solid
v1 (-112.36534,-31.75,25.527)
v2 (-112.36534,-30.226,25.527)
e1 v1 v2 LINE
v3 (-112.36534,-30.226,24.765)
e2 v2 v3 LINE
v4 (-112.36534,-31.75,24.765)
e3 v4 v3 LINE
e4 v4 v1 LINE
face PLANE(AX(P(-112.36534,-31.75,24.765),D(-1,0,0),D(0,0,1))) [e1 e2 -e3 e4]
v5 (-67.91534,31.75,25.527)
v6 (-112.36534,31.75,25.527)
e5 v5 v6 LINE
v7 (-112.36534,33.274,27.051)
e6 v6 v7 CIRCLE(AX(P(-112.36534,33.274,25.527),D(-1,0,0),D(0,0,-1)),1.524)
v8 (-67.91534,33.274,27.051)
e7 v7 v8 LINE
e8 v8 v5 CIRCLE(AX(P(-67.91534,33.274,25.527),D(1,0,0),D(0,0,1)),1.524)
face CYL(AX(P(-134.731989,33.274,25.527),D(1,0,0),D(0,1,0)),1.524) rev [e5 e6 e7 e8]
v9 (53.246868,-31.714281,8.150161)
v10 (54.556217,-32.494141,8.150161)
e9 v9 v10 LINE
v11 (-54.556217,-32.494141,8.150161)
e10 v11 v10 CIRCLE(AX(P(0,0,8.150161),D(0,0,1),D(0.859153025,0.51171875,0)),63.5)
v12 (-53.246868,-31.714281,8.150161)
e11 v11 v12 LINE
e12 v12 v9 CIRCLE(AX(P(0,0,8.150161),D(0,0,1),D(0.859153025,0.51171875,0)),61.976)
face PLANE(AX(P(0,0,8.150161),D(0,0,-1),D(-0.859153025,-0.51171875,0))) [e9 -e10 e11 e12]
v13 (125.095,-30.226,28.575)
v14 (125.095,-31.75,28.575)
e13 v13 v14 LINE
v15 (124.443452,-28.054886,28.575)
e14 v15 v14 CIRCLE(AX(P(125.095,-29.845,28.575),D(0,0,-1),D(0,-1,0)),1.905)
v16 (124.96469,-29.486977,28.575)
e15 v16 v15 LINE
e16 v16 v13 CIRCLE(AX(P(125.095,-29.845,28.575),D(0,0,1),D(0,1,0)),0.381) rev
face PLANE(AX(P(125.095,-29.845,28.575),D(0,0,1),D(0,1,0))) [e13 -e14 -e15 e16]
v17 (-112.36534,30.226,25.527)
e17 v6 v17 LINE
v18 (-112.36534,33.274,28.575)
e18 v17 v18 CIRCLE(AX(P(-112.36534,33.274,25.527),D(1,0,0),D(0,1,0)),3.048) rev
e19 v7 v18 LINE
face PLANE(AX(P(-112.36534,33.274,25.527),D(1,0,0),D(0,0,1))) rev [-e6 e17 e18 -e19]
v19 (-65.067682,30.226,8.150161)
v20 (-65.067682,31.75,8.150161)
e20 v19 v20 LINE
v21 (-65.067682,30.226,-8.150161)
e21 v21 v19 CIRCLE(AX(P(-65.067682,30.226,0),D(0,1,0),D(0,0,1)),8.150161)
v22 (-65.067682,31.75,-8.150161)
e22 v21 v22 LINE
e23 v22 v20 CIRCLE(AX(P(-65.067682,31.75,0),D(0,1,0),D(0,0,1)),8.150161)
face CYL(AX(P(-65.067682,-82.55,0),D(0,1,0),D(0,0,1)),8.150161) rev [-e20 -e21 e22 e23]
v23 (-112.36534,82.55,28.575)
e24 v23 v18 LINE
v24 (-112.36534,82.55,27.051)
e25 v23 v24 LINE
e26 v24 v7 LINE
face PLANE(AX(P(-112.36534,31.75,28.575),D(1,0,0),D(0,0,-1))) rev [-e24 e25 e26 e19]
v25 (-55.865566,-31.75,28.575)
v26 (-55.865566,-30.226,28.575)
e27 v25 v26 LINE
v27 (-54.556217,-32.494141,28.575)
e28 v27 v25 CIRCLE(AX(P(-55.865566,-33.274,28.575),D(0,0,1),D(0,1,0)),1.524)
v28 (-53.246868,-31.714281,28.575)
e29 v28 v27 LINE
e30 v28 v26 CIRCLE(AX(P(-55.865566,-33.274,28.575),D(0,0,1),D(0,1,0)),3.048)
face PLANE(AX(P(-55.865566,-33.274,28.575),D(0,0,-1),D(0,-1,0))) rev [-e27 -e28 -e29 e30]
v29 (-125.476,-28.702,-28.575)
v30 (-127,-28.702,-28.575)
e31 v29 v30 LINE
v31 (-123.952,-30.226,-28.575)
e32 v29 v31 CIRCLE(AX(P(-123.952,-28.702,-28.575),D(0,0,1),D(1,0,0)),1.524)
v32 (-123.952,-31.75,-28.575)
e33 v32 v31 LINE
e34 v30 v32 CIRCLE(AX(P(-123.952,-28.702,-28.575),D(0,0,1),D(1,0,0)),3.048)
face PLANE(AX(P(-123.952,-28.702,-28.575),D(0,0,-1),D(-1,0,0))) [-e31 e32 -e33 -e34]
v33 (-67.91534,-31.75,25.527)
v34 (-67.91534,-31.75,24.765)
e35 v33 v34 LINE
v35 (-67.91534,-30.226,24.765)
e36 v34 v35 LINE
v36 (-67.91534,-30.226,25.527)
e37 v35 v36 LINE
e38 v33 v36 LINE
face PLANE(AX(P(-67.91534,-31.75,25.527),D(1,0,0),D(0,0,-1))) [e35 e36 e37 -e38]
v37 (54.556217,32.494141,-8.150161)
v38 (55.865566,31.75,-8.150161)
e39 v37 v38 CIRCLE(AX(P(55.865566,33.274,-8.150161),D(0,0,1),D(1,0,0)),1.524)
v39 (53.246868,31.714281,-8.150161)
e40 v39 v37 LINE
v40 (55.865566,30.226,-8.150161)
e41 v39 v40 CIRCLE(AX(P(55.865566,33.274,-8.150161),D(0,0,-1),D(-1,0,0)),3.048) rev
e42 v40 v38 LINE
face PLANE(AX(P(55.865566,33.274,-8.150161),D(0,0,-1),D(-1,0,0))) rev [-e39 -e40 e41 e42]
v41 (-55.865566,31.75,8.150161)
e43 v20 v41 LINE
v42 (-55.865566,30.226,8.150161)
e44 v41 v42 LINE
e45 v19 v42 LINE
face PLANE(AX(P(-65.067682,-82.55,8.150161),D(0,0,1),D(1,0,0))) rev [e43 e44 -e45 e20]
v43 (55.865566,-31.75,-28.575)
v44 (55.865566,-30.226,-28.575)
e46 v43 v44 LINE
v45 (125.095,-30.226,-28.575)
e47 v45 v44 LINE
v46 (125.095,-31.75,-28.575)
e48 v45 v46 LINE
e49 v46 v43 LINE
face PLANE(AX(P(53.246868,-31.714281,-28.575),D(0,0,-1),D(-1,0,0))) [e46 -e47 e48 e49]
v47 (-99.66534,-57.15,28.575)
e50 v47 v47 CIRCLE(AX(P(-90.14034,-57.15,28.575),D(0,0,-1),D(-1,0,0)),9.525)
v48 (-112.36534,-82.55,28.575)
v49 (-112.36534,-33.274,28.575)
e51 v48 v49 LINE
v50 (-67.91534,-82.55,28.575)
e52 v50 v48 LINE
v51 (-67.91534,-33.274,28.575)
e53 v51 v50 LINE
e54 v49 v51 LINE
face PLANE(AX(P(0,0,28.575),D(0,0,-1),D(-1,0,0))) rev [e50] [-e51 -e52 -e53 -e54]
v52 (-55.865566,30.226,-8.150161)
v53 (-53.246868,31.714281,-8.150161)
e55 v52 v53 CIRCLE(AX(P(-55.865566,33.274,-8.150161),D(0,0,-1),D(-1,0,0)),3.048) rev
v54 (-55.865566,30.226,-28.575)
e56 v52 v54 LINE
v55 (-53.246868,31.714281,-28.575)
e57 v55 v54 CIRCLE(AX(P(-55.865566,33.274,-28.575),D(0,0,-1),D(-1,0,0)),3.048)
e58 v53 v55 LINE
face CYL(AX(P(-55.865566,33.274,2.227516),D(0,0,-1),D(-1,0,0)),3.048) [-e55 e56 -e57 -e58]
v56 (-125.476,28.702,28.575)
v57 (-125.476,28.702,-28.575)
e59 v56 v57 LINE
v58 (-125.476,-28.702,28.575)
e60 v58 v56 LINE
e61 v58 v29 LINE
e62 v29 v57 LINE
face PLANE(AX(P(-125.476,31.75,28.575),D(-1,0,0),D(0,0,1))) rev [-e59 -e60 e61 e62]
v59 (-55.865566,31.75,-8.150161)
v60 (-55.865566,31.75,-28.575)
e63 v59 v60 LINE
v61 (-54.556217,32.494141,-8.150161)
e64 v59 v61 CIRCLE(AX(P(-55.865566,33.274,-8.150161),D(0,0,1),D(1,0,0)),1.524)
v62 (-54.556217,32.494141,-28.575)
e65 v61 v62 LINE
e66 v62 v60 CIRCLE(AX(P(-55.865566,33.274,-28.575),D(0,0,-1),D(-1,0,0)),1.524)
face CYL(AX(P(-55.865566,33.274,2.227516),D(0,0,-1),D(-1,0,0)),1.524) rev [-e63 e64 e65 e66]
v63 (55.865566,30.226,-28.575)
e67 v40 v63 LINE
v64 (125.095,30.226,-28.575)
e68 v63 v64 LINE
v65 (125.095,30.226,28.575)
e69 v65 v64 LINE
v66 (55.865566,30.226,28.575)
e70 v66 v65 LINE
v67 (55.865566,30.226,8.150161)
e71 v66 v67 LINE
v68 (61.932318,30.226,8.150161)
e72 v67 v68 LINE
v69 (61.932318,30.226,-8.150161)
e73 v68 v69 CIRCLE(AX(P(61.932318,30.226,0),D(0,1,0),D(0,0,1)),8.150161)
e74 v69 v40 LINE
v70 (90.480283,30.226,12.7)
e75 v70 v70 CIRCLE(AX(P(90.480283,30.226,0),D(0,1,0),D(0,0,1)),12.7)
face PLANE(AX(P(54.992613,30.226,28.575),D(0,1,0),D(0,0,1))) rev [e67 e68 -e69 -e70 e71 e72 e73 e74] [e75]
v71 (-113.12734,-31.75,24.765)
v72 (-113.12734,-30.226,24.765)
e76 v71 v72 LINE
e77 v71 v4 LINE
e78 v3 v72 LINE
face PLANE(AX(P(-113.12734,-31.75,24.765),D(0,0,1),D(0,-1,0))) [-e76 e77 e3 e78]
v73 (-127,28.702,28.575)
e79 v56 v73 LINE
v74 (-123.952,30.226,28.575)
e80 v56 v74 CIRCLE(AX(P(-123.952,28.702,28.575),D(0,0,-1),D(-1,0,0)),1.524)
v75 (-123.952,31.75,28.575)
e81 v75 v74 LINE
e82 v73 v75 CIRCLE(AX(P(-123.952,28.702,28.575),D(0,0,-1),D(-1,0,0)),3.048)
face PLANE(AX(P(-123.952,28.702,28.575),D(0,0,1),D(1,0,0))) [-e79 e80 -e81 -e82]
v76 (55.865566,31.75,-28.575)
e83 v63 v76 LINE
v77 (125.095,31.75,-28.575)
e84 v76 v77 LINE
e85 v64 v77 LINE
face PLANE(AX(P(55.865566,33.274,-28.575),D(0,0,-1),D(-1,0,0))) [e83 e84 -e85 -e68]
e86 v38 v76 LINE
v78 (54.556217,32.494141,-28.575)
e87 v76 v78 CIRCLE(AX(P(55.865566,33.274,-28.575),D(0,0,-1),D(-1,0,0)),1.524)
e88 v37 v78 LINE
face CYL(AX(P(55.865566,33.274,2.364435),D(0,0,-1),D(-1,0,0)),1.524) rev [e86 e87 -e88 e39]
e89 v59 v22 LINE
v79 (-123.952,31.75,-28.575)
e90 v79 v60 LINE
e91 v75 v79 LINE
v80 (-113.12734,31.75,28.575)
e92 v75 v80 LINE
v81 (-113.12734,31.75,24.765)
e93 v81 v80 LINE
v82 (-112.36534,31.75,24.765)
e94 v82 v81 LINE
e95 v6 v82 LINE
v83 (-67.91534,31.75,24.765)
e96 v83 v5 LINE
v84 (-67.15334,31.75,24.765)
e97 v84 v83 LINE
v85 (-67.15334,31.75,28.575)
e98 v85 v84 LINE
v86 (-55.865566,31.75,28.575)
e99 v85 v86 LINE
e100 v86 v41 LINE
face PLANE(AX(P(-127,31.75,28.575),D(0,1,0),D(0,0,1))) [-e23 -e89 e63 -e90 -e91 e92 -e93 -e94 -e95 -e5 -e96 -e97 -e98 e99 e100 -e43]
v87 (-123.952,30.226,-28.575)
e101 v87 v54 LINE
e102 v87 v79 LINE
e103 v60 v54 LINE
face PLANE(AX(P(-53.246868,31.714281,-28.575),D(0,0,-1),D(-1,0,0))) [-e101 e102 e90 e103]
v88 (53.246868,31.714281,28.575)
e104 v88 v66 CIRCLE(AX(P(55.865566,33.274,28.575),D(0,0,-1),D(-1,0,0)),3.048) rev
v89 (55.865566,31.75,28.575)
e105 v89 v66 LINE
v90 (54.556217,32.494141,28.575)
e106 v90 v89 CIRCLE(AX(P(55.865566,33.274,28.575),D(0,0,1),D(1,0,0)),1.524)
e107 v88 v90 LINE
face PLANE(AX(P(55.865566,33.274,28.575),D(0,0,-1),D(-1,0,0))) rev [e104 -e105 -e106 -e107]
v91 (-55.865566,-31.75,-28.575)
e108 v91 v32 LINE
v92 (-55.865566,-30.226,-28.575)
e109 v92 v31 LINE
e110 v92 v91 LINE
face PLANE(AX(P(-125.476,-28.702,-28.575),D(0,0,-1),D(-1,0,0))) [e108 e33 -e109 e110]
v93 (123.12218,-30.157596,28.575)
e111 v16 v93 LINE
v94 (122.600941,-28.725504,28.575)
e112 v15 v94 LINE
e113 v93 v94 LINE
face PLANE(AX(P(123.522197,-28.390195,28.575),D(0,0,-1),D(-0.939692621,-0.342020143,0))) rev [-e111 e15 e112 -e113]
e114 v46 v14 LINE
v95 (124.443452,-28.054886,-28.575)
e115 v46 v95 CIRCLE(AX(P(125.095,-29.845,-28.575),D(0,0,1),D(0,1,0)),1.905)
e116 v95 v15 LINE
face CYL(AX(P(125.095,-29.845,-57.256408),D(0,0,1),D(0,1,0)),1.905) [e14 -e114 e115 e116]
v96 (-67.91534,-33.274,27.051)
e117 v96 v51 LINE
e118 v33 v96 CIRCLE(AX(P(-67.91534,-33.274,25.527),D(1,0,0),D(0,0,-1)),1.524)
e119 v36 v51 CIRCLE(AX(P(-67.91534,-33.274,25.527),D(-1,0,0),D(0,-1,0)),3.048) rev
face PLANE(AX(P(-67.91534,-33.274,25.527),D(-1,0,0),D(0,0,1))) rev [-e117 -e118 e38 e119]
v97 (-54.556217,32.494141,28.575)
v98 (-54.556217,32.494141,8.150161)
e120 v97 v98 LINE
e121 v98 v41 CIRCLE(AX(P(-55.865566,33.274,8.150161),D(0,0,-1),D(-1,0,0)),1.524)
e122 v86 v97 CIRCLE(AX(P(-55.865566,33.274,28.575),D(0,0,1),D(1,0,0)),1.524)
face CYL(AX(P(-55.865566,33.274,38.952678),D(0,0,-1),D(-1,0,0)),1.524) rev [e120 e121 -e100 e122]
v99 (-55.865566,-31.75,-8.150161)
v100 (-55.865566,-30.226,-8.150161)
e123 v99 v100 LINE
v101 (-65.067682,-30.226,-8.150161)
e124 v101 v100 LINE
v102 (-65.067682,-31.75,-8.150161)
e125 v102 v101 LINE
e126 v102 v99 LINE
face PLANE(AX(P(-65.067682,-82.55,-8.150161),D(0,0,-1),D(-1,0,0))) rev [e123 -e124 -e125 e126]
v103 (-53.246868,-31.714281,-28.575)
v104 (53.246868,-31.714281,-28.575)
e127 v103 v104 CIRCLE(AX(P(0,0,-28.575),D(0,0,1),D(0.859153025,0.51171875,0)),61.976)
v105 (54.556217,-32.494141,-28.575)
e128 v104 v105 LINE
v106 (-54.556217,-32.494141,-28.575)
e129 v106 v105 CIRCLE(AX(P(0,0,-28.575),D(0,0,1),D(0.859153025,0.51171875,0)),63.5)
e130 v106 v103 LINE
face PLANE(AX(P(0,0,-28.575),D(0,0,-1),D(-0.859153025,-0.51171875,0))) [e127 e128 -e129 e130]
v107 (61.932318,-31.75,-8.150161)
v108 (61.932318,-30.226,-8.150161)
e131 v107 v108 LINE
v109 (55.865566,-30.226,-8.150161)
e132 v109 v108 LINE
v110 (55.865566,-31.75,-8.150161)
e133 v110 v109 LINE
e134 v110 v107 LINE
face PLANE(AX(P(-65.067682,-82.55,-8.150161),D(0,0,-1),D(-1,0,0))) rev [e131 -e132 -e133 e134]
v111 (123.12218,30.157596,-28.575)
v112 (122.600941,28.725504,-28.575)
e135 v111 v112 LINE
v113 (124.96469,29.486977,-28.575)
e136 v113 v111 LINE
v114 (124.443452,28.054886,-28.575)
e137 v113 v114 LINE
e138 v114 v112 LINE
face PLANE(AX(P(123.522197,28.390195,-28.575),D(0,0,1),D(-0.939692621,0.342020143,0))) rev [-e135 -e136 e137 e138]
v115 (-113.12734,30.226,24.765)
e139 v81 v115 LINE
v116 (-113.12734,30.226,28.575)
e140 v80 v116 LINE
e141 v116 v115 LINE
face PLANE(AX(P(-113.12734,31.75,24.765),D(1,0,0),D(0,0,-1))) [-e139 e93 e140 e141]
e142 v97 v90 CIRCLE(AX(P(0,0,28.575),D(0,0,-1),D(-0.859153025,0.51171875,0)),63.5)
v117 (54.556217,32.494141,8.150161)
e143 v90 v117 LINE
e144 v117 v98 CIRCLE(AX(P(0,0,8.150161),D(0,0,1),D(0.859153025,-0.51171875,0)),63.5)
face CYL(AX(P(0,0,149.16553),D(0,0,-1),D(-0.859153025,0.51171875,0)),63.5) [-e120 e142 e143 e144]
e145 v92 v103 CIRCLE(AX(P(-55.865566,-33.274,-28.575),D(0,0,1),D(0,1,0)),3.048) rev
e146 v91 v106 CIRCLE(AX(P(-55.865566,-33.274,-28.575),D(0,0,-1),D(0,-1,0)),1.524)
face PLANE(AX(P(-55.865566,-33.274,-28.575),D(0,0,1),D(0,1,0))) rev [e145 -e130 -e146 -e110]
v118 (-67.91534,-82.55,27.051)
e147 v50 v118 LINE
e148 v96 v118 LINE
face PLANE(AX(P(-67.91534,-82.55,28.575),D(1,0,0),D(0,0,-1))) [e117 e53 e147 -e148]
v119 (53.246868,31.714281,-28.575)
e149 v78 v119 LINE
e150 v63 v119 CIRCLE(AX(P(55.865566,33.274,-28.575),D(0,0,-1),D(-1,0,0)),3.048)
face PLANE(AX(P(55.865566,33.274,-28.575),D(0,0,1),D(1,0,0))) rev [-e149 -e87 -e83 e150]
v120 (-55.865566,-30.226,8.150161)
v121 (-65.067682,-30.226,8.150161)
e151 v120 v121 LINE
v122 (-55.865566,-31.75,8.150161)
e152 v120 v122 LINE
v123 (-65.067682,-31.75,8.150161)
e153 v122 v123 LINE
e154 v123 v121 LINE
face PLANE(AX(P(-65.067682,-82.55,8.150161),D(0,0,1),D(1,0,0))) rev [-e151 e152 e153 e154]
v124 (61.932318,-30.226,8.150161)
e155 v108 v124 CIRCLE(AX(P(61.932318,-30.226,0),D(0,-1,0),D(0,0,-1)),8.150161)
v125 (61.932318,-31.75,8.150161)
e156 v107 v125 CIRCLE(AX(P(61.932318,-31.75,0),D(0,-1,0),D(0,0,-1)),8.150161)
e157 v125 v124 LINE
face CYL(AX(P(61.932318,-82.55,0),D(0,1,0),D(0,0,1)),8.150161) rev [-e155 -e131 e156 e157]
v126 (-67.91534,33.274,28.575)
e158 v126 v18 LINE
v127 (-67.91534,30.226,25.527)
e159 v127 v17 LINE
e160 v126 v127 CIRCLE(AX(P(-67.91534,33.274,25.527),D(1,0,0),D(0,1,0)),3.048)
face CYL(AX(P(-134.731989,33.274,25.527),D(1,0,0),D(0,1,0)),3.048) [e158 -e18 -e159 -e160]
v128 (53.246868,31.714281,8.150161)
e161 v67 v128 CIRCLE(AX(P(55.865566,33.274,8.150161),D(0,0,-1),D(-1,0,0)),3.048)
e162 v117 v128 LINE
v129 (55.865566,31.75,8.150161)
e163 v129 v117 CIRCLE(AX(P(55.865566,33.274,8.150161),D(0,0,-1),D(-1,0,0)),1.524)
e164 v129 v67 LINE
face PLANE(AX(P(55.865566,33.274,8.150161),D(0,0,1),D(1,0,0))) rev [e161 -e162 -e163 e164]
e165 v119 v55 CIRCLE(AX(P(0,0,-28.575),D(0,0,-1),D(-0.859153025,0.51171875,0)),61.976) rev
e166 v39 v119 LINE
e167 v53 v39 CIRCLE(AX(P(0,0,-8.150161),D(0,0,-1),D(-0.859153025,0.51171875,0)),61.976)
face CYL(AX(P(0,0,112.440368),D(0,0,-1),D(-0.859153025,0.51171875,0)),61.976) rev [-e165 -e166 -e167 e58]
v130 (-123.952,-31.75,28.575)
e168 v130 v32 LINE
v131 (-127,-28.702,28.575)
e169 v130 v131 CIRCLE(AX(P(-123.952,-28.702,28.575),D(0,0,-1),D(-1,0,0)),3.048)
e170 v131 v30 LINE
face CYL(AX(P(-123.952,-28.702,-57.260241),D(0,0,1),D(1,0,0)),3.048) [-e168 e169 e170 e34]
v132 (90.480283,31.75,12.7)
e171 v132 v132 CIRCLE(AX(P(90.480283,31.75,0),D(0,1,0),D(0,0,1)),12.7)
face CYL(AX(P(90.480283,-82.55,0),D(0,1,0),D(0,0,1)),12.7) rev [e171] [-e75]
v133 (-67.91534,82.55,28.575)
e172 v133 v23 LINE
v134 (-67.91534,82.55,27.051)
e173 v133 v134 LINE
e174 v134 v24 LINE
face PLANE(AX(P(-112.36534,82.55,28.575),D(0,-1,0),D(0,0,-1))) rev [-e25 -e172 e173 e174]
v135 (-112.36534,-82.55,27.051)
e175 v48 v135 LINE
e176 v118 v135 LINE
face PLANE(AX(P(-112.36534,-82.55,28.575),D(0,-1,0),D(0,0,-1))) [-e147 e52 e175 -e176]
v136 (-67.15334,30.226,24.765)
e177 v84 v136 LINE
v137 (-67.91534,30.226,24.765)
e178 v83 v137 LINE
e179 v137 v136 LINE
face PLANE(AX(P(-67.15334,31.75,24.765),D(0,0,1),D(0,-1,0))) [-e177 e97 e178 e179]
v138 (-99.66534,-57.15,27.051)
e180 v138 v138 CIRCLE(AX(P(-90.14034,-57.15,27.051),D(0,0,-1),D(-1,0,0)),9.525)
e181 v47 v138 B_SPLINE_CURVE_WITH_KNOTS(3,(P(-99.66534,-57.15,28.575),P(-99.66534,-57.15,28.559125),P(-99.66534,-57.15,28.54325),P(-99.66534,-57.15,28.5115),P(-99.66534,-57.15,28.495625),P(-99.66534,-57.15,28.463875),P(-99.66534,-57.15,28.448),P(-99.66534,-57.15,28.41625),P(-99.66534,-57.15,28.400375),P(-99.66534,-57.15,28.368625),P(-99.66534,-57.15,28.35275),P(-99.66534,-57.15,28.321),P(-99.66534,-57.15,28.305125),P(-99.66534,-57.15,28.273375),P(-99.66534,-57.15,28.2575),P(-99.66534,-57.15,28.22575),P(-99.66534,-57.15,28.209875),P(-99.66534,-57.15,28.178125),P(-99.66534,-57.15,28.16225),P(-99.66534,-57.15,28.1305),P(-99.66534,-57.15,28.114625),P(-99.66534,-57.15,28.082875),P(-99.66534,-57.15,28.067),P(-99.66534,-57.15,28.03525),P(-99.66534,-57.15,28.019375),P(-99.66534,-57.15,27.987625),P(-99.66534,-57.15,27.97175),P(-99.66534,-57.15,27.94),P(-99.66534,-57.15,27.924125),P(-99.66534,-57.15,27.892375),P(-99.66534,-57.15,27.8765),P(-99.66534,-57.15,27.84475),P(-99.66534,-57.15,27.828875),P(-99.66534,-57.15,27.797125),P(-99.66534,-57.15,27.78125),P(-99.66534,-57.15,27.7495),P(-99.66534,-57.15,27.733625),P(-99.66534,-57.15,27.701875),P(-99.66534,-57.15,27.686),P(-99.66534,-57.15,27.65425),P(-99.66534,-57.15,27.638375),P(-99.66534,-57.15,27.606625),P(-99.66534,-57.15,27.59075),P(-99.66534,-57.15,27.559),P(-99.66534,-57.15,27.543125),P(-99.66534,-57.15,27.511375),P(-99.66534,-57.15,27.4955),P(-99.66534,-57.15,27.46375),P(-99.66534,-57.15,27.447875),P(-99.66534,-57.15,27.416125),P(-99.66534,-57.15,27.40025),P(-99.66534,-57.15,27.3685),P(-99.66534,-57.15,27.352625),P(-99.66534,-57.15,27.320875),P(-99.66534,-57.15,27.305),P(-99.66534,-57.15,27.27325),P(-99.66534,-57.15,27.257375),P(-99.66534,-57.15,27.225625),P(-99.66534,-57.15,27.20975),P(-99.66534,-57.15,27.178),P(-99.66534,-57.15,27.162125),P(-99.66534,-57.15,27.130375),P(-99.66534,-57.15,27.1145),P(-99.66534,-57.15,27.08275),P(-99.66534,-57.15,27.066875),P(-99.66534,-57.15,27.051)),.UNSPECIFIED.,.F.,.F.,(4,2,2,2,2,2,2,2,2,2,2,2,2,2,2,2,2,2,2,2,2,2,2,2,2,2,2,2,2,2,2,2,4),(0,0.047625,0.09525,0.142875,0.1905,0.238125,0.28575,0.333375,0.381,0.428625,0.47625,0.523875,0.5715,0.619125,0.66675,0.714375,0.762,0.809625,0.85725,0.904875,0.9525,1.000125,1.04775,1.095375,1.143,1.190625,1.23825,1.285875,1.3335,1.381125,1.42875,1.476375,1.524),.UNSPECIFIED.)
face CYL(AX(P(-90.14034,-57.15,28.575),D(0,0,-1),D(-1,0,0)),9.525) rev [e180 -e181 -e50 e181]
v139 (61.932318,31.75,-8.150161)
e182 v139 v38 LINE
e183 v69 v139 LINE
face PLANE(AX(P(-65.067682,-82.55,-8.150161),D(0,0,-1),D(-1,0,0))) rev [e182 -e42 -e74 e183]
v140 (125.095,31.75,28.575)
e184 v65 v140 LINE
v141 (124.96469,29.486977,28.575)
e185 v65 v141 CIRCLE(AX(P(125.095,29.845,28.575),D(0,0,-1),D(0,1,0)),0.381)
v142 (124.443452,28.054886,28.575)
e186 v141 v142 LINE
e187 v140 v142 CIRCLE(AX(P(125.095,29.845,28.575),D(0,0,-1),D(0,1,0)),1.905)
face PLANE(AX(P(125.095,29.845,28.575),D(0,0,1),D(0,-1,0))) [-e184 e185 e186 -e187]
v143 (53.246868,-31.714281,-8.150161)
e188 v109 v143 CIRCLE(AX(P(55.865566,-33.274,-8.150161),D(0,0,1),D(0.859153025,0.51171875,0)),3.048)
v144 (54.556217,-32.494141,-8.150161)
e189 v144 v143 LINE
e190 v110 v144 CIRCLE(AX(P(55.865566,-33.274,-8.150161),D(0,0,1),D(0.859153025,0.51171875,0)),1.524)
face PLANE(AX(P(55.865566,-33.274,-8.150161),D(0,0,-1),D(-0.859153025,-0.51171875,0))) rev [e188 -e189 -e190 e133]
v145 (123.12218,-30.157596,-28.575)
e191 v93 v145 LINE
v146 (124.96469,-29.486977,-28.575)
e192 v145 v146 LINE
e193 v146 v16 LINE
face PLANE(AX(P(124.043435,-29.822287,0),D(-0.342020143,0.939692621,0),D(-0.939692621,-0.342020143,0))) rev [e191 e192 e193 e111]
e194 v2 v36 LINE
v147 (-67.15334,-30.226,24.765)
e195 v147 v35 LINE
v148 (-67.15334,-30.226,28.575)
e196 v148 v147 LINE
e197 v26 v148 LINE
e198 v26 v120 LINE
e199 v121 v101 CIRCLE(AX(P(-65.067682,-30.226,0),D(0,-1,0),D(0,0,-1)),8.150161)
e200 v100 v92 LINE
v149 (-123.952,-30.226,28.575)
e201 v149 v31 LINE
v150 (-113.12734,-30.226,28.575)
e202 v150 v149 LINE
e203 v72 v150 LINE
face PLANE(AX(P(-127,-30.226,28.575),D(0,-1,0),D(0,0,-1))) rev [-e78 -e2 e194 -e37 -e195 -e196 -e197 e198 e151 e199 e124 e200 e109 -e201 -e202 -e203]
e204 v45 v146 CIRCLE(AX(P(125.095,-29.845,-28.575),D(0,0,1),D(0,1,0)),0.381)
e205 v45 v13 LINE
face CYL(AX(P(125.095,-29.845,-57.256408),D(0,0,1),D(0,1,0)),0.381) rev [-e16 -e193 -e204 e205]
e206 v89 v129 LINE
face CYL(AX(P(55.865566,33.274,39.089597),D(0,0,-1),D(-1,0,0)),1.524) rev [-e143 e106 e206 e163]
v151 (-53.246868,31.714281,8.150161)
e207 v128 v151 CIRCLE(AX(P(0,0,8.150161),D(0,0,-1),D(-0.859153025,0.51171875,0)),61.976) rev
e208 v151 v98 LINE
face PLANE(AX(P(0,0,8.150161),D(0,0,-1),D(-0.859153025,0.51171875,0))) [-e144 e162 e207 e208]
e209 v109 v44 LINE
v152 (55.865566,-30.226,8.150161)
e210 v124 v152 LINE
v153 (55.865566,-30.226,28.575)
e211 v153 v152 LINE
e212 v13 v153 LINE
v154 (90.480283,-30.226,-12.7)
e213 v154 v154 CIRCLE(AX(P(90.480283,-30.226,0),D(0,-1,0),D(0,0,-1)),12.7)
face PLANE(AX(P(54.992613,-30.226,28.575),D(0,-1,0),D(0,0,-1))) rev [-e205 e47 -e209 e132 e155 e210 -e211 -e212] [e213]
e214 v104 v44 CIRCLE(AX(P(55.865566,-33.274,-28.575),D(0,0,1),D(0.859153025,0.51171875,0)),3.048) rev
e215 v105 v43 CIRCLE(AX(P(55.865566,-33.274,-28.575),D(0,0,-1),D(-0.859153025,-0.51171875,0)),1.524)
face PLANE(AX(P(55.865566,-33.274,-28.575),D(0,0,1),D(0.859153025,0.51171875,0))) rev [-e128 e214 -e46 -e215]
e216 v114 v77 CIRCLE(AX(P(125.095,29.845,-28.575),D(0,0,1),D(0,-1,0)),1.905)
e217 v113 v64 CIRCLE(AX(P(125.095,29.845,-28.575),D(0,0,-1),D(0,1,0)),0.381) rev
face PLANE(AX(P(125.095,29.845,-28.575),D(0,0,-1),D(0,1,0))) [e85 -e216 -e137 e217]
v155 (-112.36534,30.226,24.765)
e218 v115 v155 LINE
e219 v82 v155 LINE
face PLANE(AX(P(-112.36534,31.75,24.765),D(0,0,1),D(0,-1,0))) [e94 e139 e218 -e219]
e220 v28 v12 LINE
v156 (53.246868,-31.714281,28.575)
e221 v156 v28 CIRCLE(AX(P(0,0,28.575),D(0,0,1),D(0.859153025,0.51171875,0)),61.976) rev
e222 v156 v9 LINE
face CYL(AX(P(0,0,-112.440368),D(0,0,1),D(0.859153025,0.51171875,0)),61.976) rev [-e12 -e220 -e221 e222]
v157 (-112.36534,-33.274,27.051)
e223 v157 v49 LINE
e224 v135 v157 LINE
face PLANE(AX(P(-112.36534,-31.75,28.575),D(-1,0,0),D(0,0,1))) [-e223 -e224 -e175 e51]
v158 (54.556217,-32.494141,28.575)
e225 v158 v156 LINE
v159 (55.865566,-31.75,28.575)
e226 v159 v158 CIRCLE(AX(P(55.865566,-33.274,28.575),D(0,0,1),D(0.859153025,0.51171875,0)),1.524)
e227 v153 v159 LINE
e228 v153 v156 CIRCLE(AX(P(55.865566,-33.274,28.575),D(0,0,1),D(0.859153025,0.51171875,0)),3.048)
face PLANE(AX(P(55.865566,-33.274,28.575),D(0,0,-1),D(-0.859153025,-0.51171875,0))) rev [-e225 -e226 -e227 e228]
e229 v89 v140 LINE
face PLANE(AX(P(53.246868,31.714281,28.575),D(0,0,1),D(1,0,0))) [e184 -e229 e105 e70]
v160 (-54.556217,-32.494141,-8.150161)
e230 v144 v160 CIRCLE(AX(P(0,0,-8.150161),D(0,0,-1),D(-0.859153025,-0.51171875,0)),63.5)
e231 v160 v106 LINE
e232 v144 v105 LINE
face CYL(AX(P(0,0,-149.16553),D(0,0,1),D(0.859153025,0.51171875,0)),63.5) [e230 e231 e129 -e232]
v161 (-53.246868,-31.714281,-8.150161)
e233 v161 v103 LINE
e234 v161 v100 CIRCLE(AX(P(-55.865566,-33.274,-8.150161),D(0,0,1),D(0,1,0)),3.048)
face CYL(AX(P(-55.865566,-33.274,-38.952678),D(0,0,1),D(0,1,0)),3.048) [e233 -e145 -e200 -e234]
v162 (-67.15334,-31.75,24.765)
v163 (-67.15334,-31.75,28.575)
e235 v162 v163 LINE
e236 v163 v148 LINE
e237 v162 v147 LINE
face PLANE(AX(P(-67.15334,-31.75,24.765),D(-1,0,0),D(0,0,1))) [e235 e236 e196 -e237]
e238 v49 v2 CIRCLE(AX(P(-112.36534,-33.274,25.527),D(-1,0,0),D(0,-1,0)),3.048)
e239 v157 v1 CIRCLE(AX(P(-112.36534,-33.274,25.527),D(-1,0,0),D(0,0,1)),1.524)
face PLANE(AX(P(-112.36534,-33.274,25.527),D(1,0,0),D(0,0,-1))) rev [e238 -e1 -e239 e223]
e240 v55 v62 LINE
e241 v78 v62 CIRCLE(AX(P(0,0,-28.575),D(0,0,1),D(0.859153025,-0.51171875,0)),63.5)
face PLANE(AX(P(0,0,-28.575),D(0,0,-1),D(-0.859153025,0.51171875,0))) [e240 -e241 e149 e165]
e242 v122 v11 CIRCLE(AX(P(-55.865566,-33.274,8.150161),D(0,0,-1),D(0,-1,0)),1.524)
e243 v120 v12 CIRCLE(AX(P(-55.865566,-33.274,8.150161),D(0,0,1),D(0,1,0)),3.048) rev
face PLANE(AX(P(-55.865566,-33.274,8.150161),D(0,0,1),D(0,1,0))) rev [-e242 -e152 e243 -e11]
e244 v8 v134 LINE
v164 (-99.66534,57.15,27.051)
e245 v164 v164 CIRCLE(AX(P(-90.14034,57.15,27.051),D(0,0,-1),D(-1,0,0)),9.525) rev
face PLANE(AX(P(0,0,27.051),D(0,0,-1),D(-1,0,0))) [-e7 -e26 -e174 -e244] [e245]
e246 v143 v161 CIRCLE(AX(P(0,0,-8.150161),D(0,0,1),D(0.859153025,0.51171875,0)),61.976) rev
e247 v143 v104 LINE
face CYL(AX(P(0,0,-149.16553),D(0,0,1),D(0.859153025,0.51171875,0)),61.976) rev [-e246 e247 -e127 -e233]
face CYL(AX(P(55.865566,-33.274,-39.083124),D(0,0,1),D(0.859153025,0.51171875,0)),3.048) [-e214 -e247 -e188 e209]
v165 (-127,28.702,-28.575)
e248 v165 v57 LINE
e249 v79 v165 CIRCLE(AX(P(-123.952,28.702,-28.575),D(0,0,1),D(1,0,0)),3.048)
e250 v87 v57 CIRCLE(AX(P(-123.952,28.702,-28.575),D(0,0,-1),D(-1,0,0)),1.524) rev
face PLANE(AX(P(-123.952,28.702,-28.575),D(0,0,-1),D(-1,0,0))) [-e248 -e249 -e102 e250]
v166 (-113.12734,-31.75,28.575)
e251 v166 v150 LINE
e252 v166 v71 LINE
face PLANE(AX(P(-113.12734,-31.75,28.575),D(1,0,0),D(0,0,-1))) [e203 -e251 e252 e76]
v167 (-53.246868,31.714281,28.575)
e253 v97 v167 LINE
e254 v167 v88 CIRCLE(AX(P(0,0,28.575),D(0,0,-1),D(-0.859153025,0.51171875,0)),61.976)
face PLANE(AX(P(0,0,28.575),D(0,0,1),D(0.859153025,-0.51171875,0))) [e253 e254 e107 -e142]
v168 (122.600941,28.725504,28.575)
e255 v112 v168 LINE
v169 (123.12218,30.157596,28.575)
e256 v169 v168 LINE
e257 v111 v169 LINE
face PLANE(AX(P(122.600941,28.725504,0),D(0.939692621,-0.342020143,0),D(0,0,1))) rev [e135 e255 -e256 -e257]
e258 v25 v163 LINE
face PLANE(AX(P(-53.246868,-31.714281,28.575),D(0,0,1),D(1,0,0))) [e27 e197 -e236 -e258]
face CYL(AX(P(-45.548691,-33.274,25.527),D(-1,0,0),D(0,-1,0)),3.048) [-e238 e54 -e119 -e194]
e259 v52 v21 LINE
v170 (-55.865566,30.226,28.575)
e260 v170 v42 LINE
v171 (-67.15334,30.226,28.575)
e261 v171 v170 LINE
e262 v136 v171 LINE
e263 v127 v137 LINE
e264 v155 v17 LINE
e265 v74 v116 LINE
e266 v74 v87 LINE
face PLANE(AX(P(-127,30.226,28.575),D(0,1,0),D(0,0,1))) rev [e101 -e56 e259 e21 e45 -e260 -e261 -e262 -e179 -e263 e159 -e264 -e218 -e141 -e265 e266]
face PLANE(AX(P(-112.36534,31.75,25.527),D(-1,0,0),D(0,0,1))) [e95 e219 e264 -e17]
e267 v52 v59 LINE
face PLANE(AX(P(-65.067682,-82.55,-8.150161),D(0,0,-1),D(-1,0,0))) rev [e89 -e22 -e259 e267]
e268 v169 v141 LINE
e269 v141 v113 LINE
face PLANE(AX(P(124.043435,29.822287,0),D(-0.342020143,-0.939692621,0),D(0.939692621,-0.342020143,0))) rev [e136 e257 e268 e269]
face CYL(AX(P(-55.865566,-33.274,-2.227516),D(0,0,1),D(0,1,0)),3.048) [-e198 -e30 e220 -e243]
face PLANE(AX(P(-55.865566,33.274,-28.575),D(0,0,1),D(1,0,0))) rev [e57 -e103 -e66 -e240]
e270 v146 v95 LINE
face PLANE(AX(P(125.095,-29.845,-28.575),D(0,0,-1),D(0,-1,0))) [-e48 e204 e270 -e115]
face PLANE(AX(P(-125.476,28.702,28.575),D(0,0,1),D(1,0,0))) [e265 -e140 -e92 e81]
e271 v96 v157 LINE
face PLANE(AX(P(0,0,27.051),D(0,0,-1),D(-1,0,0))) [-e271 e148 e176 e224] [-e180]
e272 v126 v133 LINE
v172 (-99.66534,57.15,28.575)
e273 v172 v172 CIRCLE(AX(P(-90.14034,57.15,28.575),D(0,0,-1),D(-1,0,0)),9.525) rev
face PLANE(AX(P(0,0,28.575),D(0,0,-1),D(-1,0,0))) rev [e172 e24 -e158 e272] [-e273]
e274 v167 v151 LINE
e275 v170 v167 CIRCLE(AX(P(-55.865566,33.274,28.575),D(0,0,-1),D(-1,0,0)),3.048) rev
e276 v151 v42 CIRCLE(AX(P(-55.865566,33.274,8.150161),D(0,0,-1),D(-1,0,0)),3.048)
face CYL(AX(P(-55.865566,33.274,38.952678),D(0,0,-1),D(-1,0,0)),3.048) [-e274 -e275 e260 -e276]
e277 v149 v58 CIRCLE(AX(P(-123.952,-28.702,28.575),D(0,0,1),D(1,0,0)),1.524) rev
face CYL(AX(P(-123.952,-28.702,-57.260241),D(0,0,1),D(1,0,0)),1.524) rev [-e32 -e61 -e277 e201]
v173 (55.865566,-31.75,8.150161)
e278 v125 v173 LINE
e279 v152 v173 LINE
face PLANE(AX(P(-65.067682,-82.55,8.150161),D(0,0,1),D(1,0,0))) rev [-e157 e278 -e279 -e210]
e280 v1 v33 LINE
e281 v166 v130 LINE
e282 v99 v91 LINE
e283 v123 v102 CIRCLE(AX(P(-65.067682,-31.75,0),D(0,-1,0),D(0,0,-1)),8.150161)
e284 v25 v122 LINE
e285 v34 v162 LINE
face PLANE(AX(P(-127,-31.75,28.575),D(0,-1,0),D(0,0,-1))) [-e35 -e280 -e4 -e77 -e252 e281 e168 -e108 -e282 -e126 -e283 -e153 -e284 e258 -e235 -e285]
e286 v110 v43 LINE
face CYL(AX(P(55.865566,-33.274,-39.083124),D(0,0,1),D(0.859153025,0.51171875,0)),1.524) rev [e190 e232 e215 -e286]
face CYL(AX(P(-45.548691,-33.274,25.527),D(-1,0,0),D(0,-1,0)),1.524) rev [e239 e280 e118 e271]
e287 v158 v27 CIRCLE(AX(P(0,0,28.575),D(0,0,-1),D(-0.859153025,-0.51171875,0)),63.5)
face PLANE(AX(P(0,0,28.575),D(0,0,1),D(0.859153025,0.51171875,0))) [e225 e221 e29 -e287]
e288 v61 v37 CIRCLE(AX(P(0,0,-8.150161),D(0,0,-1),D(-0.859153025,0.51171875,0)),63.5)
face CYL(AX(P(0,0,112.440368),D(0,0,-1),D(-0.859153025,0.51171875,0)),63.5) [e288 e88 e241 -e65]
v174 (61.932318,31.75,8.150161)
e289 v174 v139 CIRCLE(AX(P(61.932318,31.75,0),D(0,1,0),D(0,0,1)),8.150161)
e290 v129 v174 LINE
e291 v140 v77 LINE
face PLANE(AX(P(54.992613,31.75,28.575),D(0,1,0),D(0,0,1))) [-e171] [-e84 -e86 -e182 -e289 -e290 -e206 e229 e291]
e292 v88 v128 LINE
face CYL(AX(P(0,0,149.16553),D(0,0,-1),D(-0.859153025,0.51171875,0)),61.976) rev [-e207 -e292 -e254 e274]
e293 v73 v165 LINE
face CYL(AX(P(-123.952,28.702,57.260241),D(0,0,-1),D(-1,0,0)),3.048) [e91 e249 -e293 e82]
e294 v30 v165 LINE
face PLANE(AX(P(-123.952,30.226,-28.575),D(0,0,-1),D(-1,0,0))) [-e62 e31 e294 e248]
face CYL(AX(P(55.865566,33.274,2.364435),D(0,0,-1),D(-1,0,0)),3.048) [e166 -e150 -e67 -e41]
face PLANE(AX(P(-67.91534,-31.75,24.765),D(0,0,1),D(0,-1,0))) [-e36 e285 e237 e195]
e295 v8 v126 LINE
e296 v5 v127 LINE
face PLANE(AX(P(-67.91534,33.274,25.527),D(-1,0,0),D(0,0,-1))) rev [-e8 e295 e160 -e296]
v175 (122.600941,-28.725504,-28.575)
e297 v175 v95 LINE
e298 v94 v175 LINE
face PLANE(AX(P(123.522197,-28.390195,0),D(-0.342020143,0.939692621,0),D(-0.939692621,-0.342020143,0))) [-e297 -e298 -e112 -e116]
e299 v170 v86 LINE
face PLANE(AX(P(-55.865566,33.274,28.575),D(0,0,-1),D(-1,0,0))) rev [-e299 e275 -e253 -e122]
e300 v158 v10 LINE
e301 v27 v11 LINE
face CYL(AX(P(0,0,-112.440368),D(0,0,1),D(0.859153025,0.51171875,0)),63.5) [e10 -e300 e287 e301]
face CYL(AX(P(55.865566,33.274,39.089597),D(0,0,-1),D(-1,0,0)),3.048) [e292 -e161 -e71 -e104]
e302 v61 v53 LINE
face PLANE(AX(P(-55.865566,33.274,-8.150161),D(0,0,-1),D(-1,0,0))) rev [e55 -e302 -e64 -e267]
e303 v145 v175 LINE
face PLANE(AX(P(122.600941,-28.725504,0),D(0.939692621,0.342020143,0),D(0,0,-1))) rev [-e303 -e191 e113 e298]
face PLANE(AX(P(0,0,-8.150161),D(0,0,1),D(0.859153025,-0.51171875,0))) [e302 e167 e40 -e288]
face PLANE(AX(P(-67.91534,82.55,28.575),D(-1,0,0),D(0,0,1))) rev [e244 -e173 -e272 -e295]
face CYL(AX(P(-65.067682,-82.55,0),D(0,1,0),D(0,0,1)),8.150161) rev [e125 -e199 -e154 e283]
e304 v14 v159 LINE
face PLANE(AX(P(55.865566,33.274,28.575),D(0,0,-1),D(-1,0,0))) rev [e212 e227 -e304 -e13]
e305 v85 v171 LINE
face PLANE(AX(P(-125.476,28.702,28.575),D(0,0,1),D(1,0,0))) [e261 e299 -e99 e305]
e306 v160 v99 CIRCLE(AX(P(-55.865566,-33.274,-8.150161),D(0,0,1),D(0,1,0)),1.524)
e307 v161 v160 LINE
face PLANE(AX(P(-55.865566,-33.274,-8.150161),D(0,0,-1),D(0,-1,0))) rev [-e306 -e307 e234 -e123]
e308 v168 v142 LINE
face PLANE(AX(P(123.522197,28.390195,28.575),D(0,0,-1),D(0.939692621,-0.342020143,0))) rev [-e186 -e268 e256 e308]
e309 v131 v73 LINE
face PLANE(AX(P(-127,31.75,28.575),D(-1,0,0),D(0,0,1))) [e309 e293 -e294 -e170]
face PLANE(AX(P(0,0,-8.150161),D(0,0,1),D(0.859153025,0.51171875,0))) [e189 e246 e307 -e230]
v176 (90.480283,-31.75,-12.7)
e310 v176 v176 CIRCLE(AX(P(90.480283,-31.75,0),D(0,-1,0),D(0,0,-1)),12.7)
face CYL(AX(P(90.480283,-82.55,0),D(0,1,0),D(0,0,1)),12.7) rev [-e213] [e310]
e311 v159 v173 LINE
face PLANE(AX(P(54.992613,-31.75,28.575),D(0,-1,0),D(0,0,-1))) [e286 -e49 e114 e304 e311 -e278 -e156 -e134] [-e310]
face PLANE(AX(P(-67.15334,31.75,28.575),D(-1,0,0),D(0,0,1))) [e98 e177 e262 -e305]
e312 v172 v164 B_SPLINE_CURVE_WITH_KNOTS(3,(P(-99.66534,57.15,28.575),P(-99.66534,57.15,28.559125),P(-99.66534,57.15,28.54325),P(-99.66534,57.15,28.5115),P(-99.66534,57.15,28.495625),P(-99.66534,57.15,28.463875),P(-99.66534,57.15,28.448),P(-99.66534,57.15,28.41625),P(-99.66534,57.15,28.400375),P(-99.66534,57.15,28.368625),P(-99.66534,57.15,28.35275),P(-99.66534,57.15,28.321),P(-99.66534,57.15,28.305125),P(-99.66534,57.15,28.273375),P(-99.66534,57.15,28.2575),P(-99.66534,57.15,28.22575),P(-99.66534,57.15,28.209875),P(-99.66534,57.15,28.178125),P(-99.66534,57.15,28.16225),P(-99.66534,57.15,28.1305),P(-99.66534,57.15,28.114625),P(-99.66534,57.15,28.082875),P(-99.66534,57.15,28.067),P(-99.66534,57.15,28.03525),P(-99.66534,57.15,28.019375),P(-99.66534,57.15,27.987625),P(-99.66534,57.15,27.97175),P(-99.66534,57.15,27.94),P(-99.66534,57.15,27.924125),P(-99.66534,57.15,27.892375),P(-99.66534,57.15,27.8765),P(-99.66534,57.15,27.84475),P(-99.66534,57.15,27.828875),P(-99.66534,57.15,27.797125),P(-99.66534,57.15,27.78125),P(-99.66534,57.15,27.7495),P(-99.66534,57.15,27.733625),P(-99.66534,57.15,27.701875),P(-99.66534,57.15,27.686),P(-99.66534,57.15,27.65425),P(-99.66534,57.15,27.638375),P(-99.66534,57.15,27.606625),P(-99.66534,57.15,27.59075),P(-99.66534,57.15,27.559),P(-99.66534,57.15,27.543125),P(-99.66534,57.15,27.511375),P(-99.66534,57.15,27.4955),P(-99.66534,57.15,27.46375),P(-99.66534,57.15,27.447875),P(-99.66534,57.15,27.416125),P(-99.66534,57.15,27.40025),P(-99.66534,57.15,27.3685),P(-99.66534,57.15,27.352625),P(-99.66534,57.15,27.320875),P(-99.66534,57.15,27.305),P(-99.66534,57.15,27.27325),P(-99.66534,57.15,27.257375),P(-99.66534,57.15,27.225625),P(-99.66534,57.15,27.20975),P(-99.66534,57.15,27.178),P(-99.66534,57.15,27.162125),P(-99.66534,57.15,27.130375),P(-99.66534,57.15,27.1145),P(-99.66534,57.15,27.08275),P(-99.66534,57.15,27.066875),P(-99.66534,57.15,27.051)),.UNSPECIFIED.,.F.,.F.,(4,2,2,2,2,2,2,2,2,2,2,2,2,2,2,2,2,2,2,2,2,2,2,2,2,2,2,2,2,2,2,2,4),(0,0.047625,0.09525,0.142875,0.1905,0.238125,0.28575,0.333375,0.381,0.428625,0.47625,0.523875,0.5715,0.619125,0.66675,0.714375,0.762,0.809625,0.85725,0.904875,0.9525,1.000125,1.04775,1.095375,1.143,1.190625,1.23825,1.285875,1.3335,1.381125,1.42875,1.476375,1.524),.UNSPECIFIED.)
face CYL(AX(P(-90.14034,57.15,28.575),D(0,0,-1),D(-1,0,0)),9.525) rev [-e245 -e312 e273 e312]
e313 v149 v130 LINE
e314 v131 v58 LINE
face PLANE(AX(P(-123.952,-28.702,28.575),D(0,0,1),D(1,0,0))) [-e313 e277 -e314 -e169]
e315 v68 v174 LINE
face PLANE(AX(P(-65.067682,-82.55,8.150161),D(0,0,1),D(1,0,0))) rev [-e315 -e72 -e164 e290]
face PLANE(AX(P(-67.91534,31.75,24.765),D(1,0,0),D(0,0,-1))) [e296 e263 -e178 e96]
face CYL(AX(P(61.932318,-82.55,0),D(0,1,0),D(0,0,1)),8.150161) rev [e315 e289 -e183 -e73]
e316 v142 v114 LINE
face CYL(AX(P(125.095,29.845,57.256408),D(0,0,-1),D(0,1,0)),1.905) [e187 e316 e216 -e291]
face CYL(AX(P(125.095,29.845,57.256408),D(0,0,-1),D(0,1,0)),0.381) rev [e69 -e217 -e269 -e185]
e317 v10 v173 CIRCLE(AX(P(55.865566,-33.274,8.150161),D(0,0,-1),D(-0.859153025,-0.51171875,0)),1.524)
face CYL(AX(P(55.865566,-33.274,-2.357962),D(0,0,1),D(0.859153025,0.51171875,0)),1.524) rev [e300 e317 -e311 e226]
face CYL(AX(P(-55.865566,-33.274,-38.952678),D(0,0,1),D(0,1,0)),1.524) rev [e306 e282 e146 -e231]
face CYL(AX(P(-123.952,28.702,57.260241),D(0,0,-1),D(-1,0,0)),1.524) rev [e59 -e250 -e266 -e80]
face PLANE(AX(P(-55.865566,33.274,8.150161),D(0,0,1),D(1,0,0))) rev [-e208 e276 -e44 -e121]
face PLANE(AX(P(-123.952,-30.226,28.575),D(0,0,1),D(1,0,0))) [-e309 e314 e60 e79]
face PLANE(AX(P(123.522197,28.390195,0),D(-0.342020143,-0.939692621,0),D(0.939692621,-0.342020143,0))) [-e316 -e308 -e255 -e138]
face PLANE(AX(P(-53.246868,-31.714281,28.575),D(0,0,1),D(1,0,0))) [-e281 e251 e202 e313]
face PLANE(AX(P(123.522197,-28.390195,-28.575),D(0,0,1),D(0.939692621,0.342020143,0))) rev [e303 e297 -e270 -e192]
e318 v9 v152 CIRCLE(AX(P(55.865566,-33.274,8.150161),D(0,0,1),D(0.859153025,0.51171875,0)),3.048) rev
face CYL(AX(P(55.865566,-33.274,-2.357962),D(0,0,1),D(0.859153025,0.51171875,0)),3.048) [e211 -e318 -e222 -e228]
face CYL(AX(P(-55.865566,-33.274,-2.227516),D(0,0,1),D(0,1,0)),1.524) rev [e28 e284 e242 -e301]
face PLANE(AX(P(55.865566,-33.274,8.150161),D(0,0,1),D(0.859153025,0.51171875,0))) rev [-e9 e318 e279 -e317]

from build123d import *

# Parameters (mm, degrees)
BASE_FLANGE1_START            = -28.575
BASE_FLANGE1_DEPTH            = 57.15
EDGE_FLANGE2_STRIP_W          = 9.144
EDGE_FLANGE2_STRIP_H          = 1.524
EDGE_FLANGE2_STRIP_CUT_DEPTH  = 44.45
EDGE_FLANGE2_RELIEF_W         = 9.906
EDGE_FLANGE2_RELIEF_H         = 0.762
EDGE_FLANGE2_RELIEF_CUT_DEPTH = 1.524
EDGE_FLANGE2_DEPTH            = 44.45
EDGE_FLANGE2_PROFILE_W        = 44.45
EDGE_FLANGE2_PROFILE_H        = 49.276
EDGE_FLANGE2_PROFILE_R        = 9.525
EDGE_FLANGE2_FLAT_DEPTH       = 1.524
HEM1_START                    = -28.575
HEM1_DEPTH                    = 57.15
HEM1_2_DEPTH                  = 57.15
SKETCH22_R                    = 12.7
CUT_EXTRUDE1_DEPTH            = 174.234005394
CUT_EXTRUDE2_DEPTH            = 174.234005394
CUT_EXTRUDE2_DEPTH_BACK       = 174.234005394


with BuildPart() as part:
    # Base-Flange1: read off the stored shape, not the designer's step
    # Base-Flange1 outline → Base-Flange1 (new body)
    with BuildSketch(Plane.XY.offset(BASE_FLANGE1_START)):
        with BuildLine():
            Line((55.865566318, 30.226), (127, 30.226))
            Line((127, 30.226), (127, 31.75))
            Line((127, 31.75), (55.865566318, 31.75))
            ThreePointArc((55.865566318, 31.75), (55.11254895, 31.949031757), (54.556217107, 32.494140625))
            ThreePointArc((54.556217107, 32.494140625), (0, 63.5), (-54.556217107, 32.494140625))
            ThreePointArc((-54.556217107, 32.494140625), (-55.11254895, 31.949031757), (-55.865566318, 31.75))
            Line((-55.865566318, 31.75), (-123.952, 31.75))
            ThreePointArc((-123.952, 31.75), (-126.107261469, 30.857261469), (-127, 28.702))
            Line((-127, 28.702), (-127, -28.702))
            ThreePointArc((-127, -28.702), (-126.107261469, -30.857261469), (-123.952, -31.75))
            Line((-123.952, -31.75), (-55.865566318, -31.75))
            ThreePointArc((-55.865566318, -31.75), (-55.11254895, -31.949031757), (-54.556217107, -32.494140625))
            ThreePointArc((-54.556217107, -32.494140625), (0, -63.5), (54.556217107, -32.494140625))
            ThreePointArc((54.556217107, -32.494140625), (55.11254895, -31.949031757), (55.865566318, -31.75))
            Line((55.865566318, -31.75), (127, -31.75))
            Line((127, -31.75), (127, -30.226))
            Line((127, -30.226), (55.865566318, -30.226))
            ThreePointArc((55.865566318, -30.226), (54.359531582, -30.624063515), (53.246867897, -31.71428125))
            ThreePointArc((53.246867897, -31.71428125), (0, -61.976), (-53.246867897, -31.71428125))
            ThreePointArc((-53.246867897, -31.71428125), (-54.359531582, -30.624063515), (-55.865566318, -30.226))
            Line((-55.865566318, -30.226), (-123.952, -30.226))
            ThreePointArc((-123.952, -30.226), (-125.029630735, -29.779630735), (-125.476, -28.702))
            Line((-125.476, -28.702), (-125.476, 28.702))
            ThreePointArc((-125.476, 28.702), (-125.029630735, 29.779630735), (-123.952, 30.226))
            Line((-123.952, 30.226), (-55.865566318, 30.226))
            ThreePointArc((-55.865566318, 30.226), (-54.359531582, 30.624063515), (-53.246867897, 31.71428125))
            ThreePointArc((-53.246867897, 31.71428125), (0, 61.976), (53.246867897, 31.71428125))
            ThreePointArc((53.246867897, 31.71428125), (54.359531582, 30.624063515), (55.865566318, 30.226))
        make_face()
    extrude(amount=BASE_FLANGE1_DEPTH)

    # Edge-Flange2: sheet metal written as solids
    # Edge-Flange2 strip (on a plane across the edge) → Edge-Flange2 strip cut (cut)
    with BuildSketch(Plane(origin=(-112.365340231, 31.75, 28.575), x_dir=(0, 0, -1), z_dir=(1, 0, 0))):
        with Locations((-1.524, -0.762)):
            Rectangle(EDGE_FLANGE2_STRIP_W, EDGE_FLANGE2_STRIP_H)
    edge_flange2_strip_cut = extrude(amount=EDGE_FLANGE2_STRIP_CUT_DEPTH, mode=Mode.SUBTRACT)

    # Edge-Flange2 relief (on the sheet) → Edge-Flange2 relief cut (cut)
    with BuildSketch(Plane(origin=(-112.365340231, 31.75, 25.527), x_dir=(0, 0, -1), z_dir=(0, 1, 0))):
        with Locations((-4.191, 0.381)):
            Rectangle(EDGE_FLANGE2_RELIEF_W, EDGE_FLANGE2_RELIEF_H)
        with Locations((-4.191, -44.831)):
            Rectangle(EDGE_FLANGE2_RELIEF_W, EDGE_FLANGE2_RELIEF_H)
    edge_flange2_relief_cut = extrude(amount=-EDGE_FLANGE2_RELIEF_CUT_DEPTH, mode=Mode.SUBTRACT)

    # Edge-Flange2 bend section (on a plane across the edge) → Edge-Flange2 (add)
    with BuildSketch(Plane(origin=(-112.365340231, 31.75, 28.575), x_dir=(0, 0, -1), z_dir=(1, 0, 0))):
        with BuildLine():
            Line((0, 1.524), (1.524, 1.524))
            ThreePointArc((1.524, 1.524), (1.970369265, 0.446369265), (3.048, 0))
            Line((3.048, 0), (3.048, -1.524))
            ThreePointArc((3.048, -1.524), (0.892738531, -0.631261469), (0, 1.524))
        make_face()
    edge_flange2 = extrude(amount=EDGE_FLANGE2_DEPTH)

    # Edge-Flange2 profile (on flange) → Edge-Flange2 flat (add)
    with BuildSketch(Plane(origin=(0, 31.75, 28.575), x_dir=(1, 0, 0), z_dir=(0, 0, 1))):
        with Locations((-90.140340231, 26.162)):
            Rectangle(EDGE_FLANGE2_PROFILE_W, EDGE_FLANGE2_PROFILE_H)
        with Locations((-90.140340231, 25.4)):
            Circle(EDGE_FLANGE2_PROFILE_R, mode=Mode.SUBTRACT)
    edge_flange2_flat = extrude(amount=-EDGE_FLANGE2_FLAT_DEPTH)

    # Mirror1: Edge-Flange2 strip cut, Edge-Flange2 relief cut, Edge-Flange2, Edge-Flange2 flat across plane
    add(edge_flange2_strip_cut.mirror(Plane.ZX), mode=Mode.SUBTRACT)
    add(edge_flange2_relief_cut.mirror(Plane.ZX), mode=Mode.SUBTRACT)
    add(edge_flange2.mirror(Plane.ZX))
    add(edge_flange2_flat.mirror(Plane.ZX))

    # Hem1: read off the stored shape, not the designer's step
    # Hem1 outline → Hem1 (cut)
    with BuildSketch(Plane.XY.offset(HEM1_START)):
        with BuildLine():
            ThreePointArc((125.095, 31.75), (126.299827788, 31.320606655), (126.961511183, 30.226))
            Line((126.961511183, 30.226), (127, 30.226))
            Line((127, 30.226), (127, 31.75))
            Line((127, 31.75), (125.095, 31.75))
        make_face()
        with BuildLine():
            Line((127, -30.226), (126.961511183, -30.226))
            ThreePointArc((126.961511183, -30.226), (126.299827788, -31.320606655), (125.095, -31.75))
            Line((125.095, -31.75), (127, -31.75))
            Line((127, -31.75), (127, -30.226))
        make_face()
    extrude(amount=HEM1_DEPTH, mode=Mode.SUBTRACT)

    # Hem1 2 outline → Hem1 2 (add)
    with BuildSketch(Plane.XY.offset(HEM1_START)):
        with BuildLine():
            Line((123.122180151, 30.157595971), (122.600941452, 28.725504417))
            Line((122.600941452, 28.725504417), (124.443451627, 28.054885557))
            ThreePointArc((124.443451627, 28.054885557), (126.338972724, 28.402239846), (126.961511183, 30.226))
            Line((126.961511183, 30.226), (125.095, 30.226))
            ThreePointArc((125.095, 30.226), (125.470211754, 29.778840044), (124.964690325, 29.486977111))
            Line((124.964690325, 29.486977111), (123.122180151, 30.157595971))
        make_face()
        with BuildLine():
            Line((122.600941452, -28.725504417), (123.122180151, -30.157595971))
            Line((123.122180151, -30.157595971), (124.964690325, -29.486977111))
            ThreePointArc((124.964690325, -29.486977111), (125.470211754, -29.778840044), (125.095, -30.226))
            Line((125.095, -30.226), (126.961511183, -30.226))
            ThreePointArc((126.961511183, -30.226), (126.338972724, -28.402239846), (124.443451627, -28.054885557))
            Line((124.443451627, -28.054885557), (122.600941452, -28.725504417))
        make_face()
    extrude(amount=HEM1_2_DEPTH)

    # Sketch22 → Cut-Extrude1 (cut, through all)
    with BuildSketch(Plane(origin=(0, 31.75, 0), x_dir=(1, 0, 0), z_dir=(0, 1, 0))):
        with Locations(Location((90.480283159, 0, 0), (0, 0, 90))):
            Circle(SKETCH22_R)
    extrude(amount=-CUT_EXTRUDE1_DEPTH, mode=Mode.SUBTRACT)

    # Sketch23 → Cut-Extrude2 (cut, two sides: drawn at the far end of the back side and taken through both)
    with BuildSketch(Plane(origin=(0, 31.75, 0), x_dir=(1, 0, 0), z_dir=(0, 1, 0)).offset(-CUT_EXTRUDE2_DEPTH_BACK)):
        with BuildLine():
            Line((-65.067682155, 8.15016142), (61.932317845, 8.15016142))
            ThreePointArc((61.932317845, 8.15016142), (70.082479265, 0), (61.932317845, -8.15016142))
            Line((61.932317845, -8.15016142), (-65.067682155, -8.15016142))
            ThreePointArc((-65.067682155, -8.15016142), (-73.217843575, 0), (-65.067682155, 8.15016142))
        make_face()
    extrude(amount=CUT_EXTRUDE2_DEPTH + CUT_EXTRUDE2_DEPTH_BACK, mode=Mode.SUBTRACT)


solid = part.part
